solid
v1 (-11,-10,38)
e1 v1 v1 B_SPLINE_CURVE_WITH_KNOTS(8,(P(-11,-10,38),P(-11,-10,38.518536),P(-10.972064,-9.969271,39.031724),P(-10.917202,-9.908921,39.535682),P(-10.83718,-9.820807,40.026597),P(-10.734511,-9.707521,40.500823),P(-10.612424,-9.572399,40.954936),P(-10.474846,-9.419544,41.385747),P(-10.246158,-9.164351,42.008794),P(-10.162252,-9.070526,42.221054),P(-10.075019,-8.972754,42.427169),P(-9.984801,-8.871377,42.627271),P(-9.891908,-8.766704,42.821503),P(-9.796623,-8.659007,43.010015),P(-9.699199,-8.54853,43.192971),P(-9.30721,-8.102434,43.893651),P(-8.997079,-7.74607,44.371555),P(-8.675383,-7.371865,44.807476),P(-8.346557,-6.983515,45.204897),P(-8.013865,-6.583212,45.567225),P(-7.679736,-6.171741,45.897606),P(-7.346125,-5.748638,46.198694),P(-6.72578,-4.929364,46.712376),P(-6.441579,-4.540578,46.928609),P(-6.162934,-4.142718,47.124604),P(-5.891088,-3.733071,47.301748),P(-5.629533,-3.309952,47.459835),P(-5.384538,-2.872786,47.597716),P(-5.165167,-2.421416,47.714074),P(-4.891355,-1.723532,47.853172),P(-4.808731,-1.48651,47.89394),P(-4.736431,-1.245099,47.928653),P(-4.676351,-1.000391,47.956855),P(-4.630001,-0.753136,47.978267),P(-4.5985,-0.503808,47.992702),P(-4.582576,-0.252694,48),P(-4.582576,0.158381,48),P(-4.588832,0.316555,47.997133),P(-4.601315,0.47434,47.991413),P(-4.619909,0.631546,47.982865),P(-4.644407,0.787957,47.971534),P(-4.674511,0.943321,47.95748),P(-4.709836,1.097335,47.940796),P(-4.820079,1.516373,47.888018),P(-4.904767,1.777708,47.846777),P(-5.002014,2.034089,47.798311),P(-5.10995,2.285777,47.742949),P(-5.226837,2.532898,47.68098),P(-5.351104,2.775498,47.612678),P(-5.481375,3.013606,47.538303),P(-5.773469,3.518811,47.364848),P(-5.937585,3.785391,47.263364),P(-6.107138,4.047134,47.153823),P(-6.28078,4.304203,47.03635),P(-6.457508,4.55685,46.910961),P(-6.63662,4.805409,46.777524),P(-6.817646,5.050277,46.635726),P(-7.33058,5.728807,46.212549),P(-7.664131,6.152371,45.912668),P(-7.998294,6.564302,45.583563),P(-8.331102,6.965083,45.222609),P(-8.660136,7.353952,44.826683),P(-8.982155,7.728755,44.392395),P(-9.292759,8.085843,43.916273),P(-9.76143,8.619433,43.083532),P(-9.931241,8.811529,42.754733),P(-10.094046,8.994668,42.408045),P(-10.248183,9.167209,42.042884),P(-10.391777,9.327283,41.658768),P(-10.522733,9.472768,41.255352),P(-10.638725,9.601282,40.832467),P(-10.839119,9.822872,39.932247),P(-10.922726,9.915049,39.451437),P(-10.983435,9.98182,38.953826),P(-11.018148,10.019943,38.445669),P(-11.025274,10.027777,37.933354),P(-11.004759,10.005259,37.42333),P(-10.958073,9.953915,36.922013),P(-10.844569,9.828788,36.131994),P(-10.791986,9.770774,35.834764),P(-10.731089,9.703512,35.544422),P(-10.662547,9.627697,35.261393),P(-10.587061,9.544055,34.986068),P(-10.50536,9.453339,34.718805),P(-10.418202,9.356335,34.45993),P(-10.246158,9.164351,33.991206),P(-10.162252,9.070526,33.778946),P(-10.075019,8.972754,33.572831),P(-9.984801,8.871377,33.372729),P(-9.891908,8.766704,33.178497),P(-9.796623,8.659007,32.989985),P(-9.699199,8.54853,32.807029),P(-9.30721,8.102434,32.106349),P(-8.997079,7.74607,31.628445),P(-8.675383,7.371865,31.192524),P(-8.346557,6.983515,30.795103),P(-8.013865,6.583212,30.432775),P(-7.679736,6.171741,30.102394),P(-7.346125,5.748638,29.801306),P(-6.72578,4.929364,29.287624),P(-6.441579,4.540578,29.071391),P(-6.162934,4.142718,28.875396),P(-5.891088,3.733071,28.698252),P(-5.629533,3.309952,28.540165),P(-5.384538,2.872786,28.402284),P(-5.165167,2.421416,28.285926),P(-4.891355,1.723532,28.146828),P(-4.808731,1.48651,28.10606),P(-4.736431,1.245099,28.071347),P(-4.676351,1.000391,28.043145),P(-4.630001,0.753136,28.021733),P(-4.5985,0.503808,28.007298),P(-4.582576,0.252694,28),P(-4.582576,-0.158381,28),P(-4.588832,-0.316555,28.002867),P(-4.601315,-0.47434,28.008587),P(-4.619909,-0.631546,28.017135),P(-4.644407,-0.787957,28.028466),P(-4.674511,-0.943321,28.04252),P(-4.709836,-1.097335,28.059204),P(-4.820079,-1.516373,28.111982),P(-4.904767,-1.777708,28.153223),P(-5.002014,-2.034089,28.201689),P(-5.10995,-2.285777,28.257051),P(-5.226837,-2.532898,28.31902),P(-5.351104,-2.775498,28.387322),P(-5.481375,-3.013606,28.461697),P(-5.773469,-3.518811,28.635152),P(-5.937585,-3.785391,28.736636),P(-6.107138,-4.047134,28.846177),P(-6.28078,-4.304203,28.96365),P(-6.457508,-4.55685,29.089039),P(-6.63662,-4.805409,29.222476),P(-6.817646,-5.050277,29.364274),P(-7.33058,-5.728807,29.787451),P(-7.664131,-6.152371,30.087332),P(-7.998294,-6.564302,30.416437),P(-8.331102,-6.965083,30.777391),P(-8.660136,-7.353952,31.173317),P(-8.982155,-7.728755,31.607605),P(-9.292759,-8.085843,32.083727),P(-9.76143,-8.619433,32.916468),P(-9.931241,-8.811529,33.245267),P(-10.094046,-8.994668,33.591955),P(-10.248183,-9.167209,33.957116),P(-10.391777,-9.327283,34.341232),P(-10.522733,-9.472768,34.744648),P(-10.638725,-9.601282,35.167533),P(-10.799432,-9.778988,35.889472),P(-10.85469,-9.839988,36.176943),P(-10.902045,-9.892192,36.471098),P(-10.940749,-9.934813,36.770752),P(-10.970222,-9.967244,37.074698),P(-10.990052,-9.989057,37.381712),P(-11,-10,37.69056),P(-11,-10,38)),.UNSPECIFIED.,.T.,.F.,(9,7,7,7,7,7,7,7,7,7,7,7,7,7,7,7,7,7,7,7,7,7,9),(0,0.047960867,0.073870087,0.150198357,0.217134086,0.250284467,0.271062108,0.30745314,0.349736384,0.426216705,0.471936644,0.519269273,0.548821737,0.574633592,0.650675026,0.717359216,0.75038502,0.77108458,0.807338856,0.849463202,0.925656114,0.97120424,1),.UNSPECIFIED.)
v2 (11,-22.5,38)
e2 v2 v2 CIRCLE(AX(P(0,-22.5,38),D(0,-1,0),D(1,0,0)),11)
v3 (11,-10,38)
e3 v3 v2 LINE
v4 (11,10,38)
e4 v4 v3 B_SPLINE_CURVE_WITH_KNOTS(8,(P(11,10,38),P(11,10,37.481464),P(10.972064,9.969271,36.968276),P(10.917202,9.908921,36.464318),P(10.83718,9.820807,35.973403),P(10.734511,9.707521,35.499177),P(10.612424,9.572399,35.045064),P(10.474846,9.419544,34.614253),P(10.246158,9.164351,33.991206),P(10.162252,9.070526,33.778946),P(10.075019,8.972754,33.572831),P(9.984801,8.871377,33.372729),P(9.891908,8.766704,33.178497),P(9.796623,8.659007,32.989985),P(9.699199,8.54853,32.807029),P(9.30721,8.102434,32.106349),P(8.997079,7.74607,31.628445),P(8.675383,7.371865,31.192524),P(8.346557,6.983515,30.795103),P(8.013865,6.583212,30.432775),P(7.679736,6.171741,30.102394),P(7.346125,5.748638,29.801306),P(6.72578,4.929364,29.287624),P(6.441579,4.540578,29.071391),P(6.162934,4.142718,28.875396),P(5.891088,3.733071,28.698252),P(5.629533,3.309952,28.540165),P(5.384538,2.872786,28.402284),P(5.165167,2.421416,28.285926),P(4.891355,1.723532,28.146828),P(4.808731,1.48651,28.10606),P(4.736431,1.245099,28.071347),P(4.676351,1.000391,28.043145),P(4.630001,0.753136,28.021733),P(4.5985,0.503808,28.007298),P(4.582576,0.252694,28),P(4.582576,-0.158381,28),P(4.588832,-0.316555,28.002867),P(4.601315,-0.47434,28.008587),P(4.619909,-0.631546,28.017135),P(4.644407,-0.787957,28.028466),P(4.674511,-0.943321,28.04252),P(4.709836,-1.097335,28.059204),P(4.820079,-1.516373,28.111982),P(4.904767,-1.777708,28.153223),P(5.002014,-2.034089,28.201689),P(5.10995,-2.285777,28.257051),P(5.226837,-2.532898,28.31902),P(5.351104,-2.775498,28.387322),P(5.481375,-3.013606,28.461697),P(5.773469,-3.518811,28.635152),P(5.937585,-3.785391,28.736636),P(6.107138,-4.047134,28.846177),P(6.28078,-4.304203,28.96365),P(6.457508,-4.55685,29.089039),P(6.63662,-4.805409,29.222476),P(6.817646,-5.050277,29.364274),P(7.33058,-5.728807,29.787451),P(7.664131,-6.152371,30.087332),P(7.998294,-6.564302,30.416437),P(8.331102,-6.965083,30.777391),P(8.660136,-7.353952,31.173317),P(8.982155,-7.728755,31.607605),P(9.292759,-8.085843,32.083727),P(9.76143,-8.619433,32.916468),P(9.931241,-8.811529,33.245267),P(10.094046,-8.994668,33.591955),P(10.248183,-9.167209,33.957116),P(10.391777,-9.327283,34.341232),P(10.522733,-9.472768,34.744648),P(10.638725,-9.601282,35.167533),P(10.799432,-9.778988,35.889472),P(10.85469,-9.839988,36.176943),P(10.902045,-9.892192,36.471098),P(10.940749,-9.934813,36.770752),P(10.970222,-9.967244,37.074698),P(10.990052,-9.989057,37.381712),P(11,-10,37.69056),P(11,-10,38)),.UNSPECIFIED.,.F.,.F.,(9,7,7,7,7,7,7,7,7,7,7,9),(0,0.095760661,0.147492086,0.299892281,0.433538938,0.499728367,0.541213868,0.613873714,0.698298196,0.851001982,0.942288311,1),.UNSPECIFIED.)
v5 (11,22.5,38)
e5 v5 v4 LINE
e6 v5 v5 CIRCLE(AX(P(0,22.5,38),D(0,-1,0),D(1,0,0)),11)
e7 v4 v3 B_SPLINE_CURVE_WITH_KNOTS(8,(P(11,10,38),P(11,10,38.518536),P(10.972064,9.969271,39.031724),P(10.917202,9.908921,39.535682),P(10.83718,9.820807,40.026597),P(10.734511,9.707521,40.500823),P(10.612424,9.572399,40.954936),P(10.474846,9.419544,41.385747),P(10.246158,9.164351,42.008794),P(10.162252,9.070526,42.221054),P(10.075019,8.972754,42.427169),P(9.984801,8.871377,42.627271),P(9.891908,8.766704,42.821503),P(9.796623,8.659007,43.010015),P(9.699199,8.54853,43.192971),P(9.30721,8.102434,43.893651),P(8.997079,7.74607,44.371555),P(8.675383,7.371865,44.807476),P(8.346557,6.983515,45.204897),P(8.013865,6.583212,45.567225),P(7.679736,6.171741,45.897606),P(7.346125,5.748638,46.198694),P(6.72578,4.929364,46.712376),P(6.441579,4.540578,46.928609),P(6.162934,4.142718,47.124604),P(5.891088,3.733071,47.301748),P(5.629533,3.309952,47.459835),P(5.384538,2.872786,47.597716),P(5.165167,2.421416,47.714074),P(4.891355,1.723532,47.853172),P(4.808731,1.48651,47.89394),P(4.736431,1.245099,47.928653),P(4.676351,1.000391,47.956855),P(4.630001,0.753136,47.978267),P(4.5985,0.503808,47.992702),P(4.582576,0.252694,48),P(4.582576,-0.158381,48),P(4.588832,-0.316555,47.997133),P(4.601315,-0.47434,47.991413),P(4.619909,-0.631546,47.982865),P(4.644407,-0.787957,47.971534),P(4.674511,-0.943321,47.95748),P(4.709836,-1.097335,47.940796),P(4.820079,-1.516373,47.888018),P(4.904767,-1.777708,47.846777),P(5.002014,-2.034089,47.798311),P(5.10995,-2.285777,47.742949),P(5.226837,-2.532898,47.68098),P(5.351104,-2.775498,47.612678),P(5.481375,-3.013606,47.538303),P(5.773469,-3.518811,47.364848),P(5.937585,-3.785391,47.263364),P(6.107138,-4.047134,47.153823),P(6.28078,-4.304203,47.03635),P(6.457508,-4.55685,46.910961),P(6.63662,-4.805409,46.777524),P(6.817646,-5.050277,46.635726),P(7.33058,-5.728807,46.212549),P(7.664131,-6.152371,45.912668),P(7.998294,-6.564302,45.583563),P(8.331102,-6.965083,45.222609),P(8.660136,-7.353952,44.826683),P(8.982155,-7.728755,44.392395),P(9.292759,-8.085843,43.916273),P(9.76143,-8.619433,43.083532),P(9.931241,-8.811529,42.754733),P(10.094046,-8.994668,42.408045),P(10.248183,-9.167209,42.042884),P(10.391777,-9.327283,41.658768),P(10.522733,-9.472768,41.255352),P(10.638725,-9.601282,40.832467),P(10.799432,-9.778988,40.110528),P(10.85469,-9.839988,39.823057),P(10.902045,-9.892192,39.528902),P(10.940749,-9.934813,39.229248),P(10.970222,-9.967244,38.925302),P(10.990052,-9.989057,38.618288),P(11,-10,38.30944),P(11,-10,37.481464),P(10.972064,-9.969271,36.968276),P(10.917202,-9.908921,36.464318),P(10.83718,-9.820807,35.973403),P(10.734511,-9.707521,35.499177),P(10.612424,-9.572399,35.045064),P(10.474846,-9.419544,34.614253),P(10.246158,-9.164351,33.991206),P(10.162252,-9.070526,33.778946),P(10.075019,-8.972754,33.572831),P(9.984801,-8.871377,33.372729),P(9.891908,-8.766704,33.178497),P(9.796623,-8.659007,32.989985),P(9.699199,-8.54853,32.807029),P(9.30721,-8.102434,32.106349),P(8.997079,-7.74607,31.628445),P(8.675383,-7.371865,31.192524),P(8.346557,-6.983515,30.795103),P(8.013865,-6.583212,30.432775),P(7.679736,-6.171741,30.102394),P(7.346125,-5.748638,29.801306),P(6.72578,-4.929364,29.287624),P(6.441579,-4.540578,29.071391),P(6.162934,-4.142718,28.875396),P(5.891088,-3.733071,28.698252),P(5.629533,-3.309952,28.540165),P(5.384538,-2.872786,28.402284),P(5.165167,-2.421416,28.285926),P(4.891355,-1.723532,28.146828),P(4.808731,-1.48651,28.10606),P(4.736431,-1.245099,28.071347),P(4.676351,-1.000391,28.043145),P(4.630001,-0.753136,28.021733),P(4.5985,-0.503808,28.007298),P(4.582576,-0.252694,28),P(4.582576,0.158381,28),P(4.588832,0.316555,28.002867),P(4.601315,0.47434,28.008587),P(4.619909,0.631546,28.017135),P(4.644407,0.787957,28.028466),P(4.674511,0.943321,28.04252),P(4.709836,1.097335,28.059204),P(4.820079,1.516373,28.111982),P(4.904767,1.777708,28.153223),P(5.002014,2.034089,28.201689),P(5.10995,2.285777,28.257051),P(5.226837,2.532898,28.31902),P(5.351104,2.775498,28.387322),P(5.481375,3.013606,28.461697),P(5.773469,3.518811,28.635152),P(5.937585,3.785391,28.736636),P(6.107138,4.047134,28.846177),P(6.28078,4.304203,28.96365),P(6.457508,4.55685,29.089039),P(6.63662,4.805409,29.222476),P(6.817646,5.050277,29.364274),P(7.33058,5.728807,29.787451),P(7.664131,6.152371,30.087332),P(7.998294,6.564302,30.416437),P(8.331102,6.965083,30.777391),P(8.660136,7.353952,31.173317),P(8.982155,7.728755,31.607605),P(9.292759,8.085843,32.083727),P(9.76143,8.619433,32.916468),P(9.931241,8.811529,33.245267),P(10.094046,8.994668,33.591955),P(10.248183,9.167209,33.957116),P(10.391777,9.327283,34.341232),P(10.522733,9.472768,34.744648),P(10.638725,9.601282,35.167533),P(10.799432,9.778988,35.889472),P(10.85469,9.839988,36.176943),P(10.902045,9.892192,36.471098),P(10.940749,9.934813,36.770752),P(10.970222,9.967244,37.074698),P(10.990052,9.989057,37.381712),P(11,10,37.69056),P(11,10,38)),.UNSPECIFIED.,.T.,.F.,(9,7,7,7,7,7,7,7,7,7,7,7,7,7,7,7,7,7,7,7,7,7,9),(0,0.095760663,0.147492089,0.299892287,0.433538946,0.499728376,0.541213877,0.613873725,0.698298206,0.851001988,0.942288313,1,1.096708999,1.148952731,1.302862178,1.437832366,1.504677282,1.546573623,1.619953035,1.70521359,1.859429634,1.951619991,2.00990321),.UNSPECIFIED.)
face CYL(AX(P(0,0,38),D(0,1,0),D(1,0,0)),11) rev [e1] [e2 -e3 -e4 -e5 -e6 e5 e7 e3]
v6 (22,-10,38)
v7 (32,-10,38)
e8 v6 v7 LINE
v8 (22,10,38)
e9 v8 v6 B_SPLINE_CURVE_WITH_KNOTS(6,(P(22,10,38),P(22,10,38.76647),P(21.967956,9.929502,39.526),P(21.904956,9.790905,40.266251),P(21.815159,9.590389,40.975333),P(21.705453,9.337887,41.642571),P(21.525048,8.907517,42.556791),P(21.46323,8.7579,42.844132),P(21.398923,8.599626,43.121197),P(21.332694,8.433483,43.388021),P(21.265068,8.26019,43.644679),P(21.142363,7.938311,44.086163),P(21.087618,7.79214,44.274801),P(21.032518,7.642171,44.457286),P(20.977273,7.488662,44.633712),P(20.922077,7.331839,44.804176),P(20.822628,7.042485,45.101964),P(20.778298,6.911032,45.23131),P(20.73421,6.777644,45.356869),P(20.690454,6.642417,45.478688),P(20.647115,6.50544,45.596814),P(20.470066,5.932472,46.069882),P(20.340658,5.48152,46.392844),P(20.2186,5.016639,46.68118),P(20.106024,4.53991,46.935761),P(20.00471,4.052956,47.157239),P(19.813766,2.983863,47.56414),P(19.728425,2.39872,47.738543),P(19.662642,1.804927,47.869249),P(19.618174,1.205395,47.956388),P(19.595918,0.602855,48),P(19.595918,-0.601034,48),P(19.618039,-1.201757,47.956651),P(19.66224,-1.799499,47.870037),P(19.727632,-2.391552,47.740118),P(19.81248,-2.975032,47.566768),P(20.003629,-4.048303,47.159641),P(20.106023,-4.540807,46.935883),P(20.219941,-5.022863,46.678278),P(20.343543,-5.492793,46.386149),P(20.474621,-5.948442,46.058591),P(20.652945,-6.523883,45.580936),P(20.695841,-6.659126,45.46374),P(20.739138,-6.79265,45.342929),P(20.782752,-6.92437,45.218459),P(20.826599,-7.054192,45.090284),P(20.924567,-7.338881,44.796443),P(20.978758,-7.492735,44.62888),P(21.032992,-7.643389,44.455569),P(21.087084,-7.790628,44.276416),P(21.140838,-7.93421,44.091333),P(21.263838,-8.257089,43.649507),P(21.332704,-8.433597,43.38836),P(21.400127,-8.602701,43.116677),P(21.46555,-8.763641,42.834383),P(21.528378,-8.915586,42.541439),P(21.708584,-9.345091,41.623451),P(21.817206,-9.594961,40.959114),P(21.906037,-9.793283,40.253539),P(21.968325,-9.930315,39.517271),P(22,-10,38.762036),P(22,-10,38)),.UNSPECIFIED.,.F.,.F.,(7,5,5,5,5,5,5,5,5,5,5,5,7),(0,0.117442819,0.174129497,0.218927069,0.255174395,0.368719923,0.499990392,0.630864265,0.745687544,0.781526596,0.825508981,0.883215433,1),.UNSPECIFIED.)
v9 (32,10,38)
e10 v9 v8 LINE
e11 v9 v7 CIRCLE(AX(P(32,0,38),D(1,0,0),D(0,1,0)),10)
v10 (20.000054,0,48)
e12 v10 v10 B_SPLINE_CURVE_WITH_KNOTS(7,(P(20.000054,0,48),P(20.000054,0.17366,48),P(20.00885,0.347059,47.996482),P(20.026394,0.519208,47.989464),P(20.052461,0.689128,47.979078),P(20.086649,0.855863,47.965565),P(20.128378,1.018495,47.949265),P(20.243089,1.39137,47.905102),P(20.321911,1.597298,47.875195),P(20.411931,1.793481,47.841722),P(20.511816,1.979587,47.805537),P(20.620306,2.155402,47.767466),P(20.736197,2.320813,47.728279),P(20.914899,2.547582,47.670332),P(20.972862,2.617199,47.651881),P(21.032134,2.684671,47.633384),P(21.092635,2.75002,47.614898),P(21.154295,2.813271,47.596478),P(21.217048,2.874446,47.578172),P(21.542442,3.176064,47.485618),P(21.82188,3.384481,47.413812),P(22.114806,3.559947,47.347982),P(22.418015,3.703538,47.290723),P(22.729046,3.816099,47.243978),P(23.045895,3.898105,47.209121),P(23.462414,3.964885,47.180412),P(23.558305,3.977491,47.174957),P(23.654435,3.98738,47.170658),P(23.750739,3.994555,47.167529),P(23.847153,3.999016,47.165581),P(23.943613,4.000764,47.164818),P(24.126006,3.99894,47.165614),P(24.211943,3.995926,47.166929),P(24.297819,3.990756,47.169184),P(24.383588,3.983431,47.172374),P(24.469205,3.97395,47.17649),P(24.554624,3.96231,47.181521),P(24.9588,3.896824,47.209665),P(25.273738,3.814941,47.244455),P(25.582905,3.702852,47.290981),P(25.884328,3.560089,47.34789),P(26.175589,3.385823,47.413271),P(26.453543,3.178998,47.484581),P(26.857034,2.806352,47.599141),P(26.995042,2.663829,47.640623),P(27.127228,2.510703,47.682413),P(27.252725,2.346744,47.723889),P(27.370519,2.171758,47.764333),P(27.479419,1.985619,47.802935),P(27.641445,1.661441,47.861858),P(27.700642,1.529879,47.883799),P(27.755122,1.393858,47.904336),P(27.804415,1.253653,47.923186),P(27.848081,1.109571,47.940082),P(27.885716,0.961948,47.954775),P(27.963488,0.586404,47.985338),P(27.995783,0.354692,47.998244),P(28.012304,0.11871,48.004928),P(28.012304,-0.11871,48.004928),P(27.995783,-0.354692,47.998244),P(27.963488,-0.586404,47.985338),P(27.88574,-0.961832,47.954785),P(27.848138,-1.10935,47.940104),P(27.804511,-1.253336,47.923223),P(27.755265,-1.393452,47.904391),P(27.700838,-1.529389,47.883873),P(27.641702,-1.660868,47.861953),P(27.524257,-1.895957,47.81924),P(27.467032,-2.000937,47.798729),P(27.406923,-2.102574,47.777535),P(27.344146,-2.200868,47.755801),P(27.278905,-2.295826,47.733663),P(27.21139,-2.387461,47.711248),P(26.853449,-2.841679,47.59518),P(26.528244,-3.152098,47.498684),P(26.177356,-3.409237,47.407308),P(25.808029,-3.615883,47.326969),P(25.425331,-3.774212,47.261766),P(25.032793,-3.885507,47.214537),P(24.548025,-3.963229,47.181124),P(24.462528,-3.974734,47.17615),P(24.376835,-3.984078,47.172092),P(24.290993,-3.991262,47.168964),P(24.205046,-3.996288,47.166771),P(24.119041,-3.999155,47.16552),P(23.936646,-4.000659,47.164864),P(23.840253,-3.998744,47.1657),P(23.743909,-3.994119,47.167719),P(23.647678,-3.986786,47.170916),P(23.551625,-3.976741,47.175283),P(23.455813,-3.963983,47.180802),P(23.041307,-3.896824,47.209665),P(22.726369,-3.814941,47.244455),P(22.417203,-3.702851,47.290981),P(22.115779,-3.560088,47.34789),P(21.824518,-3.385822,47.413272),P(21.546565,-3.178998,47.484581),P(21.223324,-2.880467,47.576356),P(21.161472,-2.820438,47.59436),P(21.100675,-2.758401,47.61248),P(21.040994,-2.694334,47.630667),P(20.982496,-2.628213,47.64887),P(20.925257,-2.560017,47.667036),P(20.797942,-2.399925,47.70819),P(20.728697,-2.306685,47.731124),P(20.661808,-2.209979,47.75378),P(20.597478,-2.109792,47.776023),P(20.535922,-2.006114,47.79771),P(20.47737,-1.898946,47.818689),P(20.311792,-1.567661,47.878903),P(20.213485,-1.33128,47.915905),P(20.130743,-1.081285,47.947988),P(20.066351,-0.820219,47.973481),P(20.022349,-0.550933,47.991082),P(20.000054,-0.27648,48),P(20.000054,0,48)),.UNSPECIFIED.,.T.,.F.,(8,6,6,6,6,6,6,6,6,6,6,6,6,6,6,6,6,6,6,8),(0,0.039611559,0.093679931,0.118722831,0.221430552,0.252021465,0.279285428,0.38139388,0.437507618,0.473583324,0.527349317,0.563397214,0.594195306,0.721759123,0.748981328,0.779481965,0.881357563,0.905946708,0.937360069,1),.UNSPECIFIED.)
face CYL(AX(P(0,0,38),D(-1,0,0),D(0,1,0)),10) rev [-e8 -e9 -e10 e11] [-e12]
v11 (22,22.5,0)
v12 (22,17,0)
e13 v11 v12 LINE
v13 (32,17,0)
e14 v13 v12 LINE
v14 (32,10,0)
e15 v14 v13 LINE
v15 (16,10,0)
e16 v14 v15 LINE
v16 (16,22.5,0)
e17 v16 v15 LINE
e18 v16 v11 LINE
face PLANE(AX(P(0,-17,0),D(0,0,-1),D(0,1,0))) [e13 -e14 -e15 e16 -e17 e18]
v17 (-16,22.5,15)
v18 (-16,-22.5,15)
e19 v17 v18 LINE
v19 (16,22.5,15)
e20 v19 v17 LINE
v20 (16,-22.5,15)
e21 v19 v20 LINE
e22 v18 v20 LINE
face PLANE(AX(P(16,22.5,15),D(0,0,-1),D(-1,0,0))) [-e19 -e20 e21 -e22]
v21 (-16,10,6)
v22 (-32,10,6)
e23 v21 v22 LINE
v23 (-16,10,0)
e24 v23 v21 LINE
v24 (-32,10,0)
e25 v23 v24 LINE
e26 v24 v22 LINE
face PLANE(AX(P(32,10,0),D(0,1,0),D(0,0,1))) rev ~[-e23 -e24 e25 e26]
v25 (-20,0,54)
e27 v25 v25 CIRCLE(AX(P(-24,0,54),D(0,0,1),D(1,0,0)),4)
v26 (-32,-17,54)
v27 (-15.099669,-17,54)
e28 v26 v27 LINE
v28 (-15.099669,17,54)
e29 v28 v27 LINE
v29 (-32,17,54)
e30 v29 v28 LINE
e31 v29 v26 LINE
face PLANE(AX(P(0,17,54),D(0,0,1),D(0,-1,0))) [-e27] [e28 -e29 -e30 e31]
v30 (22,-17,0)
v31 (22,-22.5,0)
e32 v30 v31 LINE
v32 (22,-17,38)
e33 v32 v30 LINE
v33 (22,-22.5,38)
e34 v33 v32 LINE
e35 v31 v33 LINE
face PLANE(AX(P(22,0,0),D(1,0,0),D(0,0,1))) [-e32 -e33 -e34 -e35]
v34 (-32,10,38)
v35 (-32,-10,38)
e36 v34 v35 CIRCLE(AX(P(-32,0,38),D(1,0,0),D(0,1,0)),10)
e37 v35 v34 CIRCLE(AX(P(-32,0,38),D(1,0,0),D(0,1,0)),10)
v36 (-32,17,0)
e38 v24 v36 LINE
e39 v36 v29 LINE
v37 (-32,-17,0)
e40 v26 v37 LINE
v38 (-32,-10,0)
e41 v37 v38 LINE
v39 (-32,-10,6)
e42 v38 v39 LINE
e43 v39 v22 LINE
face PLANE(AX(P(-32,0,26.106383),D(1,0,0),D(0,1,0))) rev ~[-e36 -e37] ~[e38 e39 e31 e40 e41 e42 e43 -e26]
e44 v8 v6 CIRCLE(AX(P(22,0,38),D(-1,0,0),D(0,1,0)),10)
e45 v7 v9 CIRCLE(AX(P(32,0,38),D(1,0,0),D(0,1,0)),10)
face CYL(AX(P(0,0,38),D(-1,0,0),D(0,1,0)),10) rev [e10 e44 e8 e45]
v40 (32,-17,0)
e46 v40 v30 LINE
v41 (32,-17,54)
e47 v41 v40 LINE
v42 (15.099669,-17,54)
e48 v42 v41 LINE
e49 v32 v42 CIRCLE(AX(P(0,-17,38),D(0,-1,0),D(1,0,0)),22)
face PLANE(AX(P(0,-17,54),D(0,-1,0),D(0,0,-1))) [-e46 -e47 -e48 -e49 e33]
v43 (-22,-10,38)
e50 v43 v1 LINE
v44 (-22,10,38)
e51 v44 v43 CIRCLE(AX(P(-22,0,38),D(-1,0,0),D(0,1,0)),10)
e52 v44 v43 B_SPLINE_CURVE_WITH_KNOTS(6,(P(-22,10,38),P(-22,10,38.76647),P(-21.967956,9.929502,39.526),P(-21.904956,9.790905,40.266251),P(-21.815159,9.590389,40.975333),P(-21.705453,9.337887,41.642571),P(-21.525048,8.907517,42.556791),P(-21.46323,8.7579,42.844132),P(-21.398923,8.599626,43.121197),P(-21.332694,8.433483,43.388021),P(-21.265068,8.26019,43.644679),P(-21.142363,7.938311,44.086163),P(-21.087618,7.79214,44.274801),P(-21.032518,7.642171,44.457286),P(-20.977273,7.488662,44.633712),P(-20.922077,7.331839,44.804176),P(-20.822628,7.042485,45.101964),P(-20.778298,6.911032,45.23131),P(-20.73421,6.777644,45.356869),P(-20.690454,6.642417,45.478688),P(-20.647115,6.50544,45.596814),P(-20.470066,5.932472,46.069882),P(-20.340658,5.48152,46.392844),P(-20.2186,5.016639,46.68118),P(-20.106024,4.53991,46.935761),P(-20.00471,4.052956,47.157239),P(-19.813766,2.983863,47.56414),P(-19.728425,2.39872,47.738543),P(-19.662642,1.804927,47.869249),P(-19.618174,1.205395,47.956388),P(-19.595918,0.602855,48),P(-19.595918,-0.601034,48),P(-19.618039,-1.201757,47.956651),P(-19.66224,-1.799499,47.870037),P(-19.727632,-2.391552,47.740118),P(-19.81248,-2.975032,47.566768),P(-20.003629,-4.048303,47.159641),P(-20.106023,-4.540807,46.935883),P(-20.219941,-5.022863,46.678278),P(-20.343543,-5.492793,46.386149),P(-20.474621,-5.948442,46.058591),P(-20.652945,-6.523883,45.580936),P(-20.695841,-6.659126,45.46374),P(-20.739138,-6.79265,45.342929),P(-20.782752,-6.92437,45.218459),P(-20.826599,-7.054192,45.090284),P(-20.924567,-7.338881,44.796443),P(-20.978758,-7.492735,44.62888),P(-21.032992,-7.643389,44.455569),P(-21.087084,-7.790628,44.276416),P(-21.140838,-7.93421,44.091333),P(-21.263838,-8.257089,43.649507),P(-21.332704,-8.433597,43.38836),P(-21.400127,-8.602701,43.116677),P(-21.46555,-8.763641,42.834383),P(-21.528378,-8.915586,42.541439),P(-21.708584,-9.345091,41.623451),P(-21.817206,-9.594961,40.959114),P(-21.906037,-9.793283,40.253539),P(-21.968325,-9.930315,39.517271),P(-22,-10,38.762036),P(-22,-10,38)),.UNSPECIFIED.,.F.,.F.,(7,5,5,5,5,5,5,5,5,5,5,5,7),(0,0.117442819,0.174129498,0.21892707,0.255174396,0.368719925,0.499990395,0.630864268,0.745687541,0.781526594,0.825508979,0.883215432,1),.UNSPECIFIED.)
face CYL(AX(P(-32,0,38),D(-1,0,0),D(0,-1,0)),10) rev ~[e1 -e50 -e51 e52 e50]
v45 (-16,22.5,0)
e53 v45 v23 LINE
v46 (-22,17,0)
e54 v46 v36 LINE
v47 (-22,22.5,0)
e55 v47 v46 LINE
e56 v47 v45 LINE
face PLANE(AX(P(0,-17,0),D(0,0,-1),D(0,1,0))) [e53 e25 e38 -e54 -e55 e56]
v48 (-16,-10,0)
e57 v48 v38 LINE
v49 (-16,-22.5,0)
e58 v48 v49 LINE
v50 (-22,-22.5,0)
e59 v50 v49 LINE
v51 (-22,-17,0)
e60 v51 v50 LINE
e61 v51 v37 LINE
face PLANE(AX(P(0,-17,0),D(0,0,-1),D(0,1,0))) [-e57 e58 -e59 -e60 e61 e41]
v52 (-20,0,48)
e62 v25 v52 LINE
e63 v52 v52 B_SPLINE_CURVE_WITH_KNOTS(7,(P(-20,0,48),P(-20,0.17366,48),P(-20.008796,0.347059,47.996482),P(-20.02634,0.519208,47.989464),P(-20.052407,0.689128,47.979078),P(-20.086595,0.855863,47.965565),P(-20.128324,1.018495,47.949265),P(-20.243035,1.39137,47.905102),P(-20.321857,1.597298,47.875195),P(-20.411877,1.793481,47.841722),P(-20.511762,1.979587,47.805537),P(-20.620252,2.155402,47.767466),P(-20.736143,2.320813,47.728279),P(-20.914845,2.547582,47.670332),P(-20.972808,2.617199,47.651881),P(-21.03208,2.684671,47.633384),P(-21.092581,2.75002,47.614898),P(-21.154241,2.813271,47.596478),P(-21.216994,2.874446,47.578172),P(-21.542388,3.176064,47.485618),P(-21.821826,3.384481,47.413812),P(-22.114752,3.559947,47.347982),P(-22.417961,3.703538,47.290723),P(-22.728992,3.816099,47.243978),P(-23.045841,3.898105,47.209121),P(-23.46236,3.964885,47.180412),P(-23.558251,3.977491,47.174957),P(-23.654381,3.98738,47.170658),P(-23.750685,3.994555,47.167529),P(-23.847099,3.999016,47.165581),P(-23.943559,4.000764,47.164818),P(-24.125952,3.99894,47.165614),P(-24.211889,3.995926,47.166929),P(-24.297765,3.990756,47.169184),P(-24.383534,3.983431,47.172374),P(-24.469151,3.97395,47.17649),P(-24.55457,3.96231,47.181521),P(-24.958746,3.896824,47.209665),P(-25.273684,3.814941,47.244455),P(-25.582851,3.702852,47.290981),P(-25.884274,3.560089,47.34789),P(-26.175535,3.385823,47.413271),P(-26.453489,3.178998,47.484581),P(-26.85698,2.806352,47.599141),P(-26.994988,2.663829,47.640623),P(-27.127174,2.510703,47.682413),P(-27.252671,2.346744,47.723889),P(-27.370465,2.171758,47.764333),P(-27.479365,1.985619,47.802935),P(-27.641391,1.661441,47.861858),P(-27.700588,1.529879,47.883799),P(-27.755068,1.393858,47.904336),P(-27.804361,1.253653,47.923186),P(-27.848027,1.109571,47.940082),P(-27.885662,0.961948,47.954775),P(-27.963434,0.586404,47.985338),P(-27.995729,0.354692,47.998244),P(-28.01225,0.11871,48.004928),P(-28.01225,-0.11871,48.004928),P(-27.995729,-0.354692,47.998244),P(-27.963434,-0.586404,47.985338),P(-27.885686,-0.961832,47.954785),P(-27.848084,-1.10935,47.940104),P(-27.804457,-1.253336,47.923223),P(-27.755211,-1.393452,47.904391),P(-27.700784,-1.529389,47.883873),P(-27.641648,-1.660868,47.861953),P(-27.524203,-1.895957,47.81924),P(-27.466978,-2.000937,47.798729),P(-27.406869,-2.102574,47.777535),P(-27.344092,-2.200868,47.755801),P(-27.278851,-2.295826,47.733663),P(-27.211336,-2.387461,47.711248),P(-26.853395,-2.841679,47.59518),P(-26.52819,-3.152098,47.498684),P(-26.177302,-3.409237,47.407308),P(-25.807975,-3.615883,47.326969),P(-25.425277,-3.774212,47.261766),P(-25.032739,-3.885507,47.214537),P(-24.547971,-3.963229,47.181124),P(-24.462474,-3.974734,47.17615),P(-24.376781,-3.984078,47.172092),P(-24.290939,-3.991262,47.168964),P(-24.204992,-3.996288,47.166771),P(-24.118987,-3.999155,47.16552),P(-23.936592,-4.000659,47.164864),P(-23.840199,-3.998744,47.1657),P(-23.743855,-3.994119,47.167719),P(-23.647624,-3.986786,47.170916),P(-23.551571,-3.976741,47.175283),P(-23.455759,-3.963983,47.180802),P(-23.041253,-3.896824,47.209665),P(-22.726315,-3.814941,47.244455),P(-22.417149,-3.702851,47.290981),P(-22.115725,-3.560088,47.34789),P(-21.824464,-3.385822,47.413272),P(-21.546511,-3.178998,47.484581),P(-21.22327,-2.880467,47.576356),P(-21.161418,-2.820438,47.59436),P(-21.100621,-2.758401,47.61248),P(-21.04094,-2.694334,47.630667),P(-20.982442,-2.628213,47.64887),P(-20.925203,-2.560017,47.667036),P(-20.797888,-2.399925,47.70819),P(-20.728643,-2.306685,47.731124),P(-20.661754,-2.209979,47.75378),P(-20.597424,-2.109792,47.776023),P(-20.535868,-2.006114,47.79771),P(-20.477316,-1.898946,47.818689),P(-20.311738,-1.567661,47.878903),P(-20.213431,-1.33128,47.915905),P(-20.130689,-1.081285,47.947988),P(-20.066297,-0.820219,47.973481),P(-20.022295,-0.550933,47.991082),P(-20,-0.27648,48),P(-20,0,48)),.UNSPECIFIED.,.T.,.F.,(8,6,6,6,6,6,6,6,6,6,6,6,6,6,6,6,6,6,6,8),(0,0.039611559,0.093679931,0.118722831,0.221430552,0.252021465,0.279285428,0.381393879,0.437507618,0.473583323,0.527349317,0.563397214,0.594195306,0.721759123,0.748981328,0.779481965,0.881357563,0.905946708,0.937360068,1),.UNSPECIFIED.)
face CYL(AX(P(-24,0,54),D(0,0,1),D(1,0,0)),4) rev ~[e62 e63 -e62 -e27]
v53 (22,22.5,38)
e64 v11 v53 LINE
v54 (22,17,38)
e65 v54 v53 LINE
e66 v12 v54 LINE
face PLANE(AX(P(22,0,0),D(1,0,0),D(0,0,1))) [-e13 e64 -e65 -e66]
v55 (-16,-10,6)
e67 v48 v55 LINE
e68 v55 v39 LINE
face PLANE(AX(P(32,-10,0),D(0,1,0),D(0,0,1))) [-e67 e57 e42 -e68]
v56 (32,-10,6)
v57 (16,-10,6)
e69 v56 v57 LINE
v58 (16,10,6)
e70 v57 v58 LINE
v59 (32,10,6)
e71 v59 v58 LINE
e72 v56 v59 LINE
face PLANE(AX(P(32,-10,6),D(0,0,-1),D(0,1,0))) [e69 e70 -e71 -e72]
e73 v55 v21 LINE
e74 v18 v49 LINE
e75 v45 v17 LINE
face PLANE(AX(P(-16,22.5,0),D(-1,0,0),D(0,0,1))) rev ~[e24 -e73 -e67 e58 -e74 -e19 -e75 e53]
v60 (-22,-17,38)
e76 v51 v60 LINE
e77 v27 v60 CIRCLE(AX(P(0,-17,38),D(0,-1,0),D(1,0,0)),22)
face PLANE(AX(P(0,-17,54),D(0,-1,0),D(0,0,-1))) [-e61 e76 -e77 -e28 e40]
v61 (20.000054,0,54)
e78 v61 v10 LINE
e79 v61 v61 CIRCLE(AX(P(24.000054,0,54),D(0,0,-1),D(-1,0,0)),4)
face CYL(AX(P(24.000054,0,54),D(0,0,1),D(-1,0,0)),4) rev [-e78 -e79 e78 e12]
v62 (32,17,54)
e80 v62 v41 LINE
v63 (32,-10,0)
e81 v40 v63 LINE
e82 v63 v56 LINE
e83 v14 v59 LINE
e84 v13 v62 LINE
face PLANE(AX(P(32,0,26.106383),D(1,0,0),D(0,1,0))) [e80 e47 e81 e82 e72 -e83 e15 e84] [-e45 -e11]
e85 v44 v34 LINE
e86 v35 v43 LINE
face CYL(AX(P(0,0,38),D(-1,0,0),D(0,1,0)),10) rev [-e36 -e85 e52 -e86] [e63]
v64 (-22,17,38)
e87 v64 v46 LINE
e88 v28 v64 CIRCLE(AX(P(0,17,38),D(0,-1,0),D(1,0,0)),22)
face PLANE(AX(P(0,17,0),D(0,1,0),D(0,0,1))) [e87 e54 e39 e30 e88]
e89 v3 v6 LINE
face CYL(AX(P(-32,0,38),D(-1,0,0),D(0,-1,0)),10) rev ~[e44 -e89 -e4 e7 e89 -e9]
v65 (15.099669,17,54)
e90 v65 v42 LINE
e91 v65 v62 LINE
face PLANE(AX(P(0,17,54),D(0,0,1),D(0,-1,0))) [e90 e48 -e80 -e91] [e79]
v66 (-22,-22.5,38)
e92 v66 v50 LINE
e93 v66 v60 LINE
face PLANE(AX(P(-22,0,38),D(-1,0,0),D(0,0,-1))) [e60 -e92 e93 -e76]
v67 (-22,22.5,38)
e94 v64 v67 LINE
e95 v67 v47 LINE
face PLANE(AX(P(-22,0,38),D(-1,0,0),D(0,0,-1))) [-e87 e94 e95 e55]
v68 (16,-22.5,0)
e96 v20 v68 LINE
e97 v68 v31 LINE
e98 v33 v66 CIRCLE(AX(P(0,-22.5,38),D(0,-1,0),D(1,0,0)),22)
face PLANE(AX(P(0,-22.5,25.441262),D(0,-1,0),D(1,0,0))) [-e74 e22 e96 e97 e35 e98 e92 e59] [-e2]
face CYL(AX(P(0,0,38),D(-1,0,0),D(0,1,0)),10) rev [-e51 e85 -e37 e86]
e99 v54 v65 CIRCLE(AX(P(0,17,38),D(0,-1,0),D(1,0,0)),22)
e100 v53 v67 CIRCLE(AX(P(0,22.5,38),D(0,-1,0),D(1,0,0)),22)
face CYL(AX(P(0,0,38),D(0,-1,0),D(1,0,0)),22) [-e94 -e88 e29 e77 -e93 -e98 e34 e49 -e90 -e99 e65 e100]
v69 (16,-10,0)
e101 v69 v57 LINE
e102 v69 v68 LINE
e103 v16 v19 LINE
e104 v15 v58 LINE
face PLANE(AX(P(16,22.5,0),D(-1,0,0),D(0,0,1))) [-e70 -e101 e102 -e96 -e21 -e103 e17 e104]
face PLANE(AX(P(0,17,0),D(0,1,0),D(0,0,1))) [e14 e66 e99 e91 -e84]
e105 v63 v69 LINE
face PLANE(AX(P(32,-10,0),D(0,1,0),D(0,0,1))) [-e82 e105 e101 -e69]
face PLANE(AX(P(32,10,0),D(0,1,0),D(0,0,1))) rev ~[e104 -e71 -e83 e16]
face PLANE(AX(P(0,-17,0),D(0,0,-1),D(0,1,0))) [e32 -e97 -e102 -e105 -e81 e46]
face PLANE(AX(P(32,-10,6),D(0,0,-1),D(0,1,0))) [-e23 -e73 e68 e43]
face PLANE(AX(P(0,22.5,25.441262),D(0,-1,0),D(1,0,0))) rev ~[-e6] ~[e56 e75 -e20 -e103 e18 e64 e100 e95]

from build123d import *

# Parameters (mm, degrees)
F0_R      = 11
F0_W      = 32
F0_H      = 15
F1_DEPTH  = 22.5
F2_R      = 10
F2_W      = 20
F2_H      = 6
F3_DEPTH  = 32
F4_R      = 11
F5_DEPTH  = 45.001
F6_R      = 10
F7_DEPTH  = 64.0010001
F8_W      = 20
F8_H      = 6
F9_DEPTH  = 64.0010001
F10_W     = 32
F10_H     = 15
F11_DEPTH = 45.001
F12_R     = 4
F13_DEPTH = 15


# Not quite as in the source:
# - a pattern or mirror of a feature is missing from the dataset's text; its kind, count and spacing are read off the source's solid


with BuildPart() as f1:
    # F0 (on Front) → F1 (new body, symmetric)
    with BuildSketch(Plane.XZ):
        with BuildLine():
            Line((-22, 38), (-22, 0))
            Line((-22, 0), (-16, 0))
            Line((-16, 0), (-16, 15))
            Line((-16, 15), (16, 15))
            Line((16, 15), (16, 0))
            Line((16, 0), (22, 0))
            Line((22, 0), (22, 38))
            ThreePointArc((22, 38), (0, 60), (-22, 38))
        make_face()
        with Locations((0, 38)):
            Circle(F0_R, mode=Mode.SUBTRACT)
        with Locations((0, 7.5)):
            Rectangle(F0_W, F0_H)
    extrude(amount=F1_DEPTH, both=True)

    # F2 (on Right) → F3 (join, symmetric)
    with BuildSketch(Plane.YZ):
        Polygon((17, 0), (17, 54), (-17, 54), (-17, 0), (-10, 0), (-10, 6), (10, 6), (10, 0), align=None)
        with Locations((0, 38)):
            Circle(F2_R, mode=Mode.SUBTRACT)
        with Locations((0, 3)):
            Rectangle(F2_W, F2_H)
    extrude(amount=F3_DEPTH, both=True)

    # F4 (on face) → F5 (cut, through all)
    with BuildSketch(Plane.XZ.offset(22.5)):
        with Locations((0, 38)):
            Circle(F4_R)
    extrude(amount=-F5_DEPTH, mode=Mode.SUBTRACT)

    # F6 (on face) → F7 (cut, through all)
    with BuildSketch(Plane(origin=(-32, 0, 0), x_dir=(0, -1, 0), z_dir=(-1, 0, 0))):
        with Locations((0, 38)):
            Circle(F6_R)
    extrude(amount=-F7_DEPTH, mode=Mode.SUBTRACT)

    # F8 (on face) → F9 (cut, through all)
    with BuildSketch(Plane.YZ.offset(32)):
        with Locations((0, 3)):
            Rectangle(F8_W, F8_H)
    extrude(amount=-F9_DEPTH, mode=Mode.SUBTRACT)

    # F10 (on face) → F11 (cut, through all)
    with BuildSketch(Plane(origin=(0, 22.5, 0), x_dir=(-1, 0, 0), z_dir=(0, 1, 0))):
        with Locations((0, 7.5)):
            Rectangle(F10_W, F10_H)
    extrude(amount=-F11_DEPTH, mode=Mode.SUBTRACT)

    # F12 (on face) → F13 (cut)
    with BuildSketch(Plane.XY.offset(54)):
        with Locations((-24, 0)):
            Circle(F12_R)
    f13 = extrude(amount=-F13_DEPTH, mode=Mode.SUBTRACT)

    # F13_copies: F13 across plane
    add(f13.mirror(Plane(origin=(2.7e-05, 0, 0), x_dir=(0, 0, 1), z_dir=(1, 0, 0))), mode=Mode.SUBTRACT)


solid = f1.part
